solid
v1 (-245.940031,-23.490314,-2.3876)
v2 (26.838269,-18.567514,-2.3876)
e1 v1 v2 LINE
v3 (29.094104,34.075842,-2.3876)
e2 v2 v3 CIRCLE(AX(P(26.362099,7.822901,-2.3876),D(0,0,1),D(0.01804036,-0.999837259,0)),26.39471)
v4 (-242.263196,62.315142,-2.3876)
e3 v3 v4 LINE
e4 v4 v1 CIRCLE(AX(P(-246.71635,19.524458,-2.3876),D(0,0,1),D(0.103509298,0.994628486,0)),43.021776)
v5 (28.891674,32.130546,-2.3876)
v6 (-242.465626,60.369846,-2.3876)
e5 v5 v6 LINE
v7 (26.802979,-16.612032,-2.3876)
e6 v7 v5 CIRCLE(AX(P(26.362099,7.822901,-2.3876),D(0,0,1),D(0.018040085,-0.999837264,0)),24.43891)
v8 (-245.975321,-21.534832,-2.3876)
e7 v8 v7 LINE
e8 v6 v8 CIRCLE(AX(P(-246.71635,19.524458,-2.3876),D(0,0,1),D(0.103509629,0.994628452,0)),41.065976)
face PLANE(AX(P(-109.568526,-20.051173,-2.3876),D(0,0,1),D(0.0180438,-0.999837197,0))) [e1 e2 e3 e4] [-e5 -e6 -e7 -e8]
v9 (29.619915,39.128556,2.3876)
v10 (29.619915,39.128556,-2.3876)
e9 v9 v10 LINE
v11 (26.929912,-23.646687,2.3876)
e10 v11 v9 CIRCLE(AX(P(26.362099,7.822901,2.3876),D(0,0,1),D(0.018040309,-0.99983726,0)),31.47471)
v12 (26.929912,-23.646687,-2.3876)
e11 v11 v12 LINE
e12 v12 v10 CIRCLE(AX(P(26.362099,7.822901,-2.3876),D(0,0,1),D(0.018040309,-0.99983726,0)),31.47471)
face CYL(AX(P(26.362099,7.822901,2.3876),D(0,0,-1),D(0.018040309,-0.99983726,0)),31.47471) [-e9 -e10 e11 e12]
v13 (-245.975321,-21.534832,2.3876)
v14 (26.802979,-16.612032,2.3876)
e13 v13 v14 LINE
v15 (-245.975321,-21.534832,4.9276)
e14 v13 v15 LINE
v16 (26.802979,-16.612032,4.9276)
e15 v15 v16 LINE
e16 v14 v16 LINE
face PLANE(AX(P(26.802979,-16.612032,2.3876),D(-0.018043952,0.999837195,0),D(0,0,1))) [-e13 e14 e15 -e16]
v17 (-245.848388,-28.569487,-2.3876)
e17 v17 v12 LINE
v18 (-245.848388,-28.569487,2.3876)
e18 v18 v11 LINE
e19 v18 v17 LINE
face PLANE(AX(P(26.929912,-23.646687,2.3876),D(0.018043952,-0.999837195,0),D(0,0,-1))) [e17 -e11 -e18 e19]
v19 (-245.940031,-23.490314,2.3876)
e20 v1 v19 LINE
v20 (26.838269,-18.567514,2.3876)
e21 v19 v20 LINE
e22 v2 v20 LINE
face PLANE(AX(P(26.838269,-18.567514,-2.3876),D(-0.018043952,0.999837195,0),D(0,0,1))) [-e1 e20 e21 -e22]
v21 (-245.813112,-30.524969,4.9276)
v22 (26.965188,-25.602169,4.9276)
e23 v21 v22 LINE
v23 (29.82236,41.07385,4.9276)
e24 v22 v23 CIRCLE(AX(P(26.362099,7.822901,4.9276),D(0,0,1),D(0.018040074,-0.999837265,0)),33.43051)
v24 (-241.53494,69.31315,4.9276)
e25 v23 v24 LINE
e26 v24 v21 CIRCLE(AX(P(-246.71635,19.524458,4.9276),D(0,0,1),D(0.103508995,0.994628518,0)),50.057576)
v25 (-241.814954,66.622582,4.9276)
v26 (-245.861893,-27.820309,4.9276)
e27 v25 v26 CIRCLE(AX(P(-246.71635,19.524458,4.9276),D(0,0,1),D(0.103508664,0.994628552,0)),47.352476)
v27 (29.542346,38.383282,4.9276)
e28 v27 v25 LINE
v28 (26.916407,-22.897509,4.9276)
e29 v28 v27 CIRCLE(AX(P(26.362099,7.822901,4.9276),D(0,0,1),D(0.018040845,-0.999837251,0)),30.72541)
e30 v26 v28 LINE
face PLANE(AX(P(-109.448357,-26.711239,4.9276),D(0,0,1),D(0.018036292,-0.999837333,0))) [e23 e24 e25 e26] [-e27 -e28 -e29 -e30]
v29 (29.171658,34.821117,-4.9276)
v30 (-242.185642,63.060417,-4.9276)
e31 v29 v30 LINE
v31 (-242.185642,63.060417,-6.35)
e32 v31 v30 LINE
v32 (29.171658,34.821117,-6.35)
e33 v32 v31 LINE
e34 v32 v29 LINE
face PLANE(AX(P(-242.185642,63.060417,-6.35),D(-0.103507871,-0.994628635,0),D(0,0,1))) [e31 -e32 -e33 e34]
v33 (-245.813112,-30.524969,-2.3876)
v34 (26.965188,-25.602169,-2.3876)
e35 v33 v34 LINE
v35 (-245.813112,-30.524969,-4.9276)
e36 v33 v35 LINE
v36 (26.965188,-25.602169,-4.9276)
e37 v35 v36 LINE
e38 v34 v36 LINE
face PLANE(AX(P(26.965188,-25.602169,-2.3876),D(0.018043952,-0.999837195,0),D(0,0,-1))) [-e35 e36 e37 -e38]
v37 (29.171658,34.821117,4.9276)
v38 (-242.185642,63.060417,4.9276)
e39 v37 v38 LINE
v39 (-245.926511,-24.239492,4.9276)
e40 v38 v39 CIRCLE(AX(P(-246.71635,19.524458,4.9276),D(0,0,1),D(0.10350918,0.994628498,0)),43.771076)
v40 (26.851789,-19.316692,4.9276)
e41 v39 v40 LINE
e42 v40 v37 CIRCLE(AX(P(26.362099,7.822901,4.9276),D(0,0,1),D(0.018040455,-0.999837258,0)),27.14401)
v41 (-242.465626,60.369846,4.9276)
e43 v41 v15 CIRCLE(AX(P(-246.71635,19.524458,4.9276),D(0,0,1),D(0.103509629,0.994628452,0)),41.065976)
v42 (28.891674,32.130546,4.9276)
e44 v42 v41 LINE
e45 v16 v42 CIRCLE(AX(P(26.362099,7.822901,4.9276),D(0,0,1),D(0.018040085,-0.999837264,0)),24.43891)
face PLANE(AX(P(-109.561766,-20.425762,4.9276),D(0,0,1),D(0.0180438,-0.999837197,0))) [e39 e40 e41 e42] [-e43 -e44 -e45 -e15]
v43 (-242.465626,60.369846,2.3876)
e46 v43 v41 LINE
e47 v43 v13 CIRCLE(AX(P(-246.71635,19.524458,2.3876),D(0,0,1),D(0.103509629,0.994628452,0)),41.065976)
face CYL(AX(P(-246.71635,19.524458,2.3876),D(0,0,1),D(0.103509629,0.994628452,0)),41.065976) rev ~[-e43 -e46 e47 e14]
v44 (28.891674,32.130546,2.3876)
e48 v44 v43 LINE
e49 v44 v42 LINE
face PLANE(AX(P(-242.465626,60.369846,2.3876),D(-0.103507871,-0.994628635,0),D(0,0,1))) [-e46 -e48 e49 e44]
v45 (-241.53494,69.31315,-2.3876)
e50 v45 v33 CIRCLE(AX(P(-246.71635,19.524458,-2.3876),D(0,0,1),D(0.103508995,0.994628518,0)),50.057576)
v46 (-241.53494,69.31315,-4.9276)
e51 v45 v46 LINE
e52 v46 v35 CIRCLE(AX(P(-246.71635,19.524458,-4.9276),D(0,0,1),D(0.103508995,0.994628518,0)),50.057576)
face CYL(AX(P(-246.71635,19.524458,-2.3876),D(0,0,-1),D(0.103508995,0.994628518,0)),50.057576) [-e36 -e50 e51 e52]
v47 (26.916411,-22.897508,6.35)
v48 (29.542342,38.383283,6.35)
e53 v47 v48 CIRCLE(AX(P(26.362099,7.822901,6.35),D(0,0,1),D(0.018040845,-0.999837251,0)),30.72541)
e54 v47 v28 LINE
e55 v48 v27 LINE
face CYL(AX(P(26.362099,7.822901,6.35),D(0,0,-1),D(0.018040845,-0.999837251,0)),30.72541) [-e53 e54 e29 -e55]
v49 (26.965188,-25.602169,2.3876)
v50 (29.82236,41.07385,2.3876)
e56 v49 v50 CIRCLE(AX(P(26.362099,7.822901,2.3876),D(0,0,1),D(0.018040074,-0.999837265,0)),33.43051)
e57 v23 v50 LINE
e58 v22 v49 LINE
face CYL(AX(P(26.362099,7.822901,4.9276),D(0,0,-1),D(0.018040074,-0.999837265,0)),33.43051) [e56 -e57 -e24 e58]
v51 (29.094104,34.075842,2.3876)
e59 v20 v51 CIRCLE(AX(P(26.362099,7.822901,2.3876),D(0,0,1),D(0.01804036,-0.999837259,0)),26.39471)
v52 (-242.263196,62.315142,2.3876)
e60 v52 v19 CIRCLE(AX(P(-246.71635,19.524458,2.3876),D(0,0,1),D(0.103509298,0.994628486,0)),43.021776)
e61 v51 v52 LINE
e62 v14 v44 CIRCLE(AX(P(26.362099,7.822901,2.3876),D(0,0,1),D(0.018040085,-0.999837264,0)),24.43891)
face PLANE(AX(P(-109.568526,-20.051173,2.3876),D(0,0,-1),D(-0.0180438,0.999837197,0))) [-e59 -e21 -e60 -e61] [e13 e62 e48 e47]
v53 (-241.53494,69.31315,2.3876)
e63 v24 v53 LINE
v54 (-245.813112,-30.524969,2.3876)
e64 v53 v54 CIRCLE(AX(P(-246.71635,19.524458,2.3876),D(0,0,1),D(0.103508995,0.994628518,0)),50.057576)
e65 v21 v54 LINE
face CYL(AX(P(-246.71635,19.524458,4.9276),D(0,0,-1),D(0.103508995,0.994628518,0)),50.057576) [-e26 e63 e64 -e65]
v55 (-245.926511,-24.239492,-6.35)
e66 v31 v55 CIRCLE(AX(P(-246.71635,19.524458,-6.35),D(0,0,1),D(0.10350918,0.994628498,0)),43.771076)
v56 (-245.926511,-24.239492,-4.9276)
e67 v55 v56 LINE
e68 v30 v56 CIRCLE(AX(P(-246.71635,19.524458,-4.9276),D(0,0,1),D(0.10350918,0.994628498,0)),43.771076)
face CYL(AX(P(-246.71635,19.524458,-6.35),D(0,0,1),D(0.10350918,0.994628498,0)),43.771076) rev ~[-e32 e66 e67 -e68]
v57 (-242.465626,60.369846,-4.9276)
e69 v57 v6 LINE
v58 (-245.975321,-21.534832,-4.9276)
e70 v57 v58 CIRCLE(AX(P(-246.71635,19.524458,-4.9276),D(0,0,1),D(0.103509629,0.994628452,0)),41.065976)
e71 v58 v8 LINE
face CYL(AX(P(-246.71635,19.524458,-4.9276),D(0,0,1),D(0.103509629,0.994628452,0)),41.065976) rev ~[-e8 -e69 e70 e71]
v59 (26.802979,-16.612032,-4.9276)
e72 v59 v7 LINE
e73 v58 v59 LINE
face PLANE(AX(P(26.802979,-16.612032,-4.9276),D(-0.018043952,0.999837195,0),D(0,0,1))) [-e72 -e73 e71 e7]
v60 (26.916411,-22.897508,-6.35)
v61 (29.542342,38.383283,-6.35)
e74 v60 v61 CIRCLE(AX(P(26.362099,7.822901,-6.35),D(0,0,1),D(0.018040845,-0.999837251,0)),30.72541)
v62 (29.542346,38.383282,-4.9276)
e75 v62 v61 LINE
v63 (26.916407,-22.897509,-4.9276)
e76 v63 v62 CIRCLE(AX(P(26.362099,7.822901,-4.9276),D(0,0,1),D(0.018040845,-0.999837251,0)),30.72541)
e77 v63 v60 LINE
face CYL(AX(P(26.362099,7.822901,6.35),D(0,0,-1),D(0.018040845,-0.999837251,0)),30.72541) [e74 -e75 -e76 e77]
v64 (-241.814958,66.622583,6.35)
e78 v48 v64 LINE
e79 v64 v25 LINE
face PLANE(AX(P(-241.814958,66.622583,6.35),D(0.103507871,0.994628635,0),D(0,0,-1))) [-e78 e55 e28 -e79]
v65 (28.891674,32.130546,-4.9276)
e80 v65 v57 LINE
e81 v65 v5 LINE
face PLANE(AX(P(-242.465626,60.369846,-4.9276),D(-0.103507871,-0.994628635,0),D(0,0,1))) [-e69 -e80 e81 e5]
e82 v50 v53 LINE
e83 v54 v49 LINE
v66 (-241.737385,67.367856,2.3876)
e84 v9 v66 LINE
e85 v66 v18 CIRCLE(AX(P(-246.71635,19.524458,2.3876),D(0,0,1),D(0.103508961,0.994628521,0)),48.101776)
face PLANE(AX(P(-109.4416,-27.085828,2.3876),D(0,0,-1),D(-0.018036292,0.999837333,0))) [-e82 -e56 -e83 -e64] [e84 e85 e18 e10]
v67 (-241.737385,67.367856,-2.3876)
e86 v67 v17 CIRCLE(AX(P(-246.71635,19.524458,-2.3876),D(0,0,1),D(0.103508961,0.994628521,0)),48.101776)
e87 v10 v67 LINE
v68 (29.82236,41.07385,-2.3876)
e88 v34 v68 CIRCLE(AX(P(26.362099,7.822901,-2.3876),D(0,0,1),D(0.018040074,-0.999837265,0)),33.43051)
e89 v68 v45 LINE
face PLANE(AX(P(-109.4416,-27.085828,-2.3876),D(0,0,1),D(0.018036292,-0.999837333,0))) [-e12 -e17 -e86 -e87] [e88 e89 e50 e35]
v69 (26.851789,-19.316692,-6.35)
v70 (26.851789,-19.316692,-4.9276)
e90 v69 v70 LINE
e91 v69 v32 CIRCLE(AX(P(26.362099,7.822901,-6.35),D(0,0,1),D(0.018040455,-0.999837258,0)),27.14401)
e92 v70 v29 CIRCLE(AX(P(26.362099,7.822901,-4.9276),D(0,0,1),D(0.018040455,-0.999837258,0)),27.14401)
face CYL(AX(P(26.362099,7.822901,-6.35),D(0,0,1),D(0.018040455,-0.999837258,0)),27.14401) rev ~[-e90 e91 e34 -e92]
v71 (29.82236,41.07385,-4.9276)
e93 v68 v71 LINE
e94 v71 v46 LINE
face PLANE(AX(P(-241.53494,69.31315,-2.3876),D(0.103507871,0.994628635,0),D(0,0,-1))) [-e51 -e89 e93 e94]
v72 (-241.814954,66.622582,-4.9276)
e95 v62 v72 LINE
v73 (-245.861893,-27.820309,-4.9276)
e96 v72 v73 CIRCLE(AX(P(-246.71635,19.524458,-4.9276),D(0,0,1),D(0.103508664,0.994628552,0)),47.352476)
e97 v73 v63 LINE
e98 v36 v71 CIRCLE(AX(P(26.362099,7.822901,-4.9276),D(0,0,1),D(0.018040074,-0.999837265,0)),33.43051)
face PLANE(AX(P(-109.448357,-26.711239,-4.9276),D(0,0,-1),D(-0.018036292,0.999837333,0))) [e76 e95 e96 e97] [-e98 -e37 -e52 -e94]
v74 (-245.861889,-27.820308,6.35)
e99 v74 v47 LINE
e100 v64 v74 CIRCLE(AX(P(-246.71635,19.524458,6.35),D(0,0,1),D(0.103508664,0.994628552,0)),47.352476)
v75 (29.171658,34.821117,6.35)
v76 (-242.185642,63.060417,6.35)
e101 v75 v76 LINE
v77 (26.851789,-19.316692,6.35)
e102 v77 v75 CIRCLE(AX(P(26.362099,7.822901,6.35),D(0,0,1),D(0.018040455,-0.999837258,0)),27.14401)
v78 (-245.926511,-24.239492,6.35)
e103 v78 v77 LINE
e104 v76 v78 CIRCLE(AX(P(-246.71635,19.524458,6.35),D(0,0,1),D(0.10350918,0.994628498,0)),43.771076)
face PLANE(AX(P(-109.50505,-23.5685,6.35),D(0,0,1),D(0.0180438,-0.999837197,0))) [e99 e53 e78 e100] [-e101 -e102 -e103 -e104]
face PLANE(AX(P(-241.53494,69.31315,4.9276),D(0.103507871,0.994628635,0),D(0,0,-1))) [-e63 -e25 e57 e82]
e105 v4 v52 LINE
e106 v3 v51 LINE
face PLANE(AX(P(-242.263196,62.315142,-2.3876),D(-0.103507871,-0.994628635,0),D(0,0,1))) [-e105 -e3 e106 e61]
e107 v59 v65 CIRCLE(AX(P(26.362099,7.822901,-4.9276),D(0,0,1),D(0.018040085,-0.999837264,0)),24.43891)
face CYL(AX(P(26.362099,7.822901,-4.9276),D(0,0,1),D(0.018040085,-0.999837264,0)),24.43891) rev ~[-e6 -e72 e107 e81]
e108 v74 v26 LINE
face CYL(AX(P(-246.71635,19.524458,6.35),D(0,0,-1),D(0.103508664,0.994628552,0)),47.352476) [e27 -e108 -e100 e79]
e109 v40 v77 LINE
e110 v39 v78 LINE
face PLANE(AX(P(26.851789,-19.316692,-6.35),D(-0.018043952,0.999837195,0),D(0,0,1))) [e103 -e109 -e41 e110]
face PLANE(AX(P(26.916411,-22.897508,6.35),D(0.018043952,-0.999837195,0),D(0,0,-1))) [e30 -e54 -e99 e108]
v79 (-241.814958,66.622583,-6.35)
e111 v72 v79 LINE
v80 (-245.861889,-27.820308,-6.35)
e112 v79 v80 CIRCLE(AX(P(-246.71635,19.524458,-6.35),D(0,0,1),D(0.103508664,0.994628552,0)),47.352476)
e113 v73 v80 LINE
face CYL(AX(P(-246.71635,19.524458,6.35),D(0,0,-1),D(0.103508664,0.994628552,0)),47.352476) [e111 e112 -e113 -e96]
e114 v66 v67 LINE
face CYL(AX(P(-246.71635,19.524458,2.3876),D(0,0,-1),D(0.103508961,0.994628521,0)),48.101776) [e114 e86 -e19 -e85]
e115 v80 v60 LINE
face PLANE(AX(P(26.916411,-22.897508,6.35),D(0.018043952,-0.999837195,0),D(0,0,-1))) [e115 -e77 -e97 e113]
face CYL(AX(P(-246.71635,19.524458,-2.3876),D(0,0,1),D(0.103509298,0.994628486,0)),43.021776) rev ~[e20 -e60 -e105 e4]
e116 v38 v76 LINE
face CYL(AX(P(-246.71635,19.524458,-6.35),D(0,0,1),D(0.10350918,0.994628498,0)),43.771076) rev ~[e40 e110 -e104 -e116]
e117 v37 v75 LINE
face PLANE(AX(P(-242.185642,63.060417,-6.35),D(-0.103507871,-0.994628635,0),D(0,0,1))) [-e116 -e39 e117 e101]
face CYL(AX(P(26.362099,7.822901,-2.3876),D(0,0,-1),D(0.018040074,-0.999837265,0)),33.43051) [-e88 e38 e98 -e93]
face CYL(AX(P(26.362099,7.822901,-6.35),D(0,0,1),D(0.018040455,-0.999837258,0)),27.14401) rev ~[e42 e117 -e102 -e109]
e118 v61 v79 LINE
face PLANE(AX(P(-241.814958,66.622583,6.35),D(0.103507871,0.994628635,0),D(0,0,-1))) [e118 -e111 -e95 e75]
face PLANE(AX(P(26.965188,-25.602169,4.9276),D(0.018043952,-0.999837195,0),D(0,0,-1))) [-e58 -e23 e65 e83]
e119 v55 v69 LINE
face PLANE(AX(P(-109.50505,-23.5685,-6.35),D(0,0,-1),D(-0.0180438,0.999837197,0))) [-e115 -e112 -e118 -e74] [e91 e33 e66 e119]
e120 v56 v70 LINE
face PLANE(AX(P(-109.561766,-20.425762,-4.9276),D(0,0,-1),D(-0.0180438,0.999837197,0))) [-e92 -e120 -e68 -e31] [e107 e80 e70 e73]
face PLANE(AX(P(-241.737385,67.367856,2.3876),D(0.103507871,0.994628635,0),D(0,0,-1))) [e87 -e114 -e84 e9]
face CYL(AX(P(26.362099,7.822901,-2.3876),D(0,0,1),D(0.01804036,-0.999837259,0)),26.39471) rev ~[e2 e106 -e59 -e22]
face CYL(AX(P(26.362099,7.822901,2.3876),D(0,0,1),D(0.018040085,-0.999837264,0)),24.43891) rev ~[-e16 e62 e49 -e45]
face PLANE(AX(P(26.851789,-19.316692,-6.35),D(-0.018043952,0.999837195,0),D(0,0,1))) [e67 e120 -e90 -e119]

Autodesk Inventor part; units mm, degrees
ref_plane "Work Plane2" through (-246.7163, 19.5244, 0) normal (-1, 0, 0) x (0, 0, 1)
ref_plane "Work Plane3" through (26.3621, 7.8229, 0) normal (-0.9253906, 0.3790148, 0) x (0, 0, 1)
sketch "Path" plane through (0, 0, 0) normal (0, 0, 1) x (1, 0, 0)
  arc A0 (-242.0003, 64.8415) -> (-245.8942, -26.0299) centre (-246.7163, 19.5244) ccw
  arc A1 (26.8841, -21.1071) -> (29.357, 36.6022) centre (26.3621, 7.8229) ccw
  line L0 (26.8841, -21.1071) -> (-245.8942, -26.0299)
  line L1 (-242.0003, 64.8415) -> (29.357, 36.6022)
  dimension "d31" = 8.9916
ref_plane "Section Plane" through (-245.8942, -26.0299, 0) normal (0.9998372, 0.0180438, 0) x (0, 0, 1)
sketch "Section Sketch" plane through (-245.8942, -26.0299, 0) normal (0.9998372, 0.0180438, 0) x (0, 0, 1)
  line L0 (-6.35, -1.7907) -> (6.35, -1.7907)
  line L1 (6.35, -1.7907) -> (6.35, 1.7907)
  line L2 (6.35, 1.7907) -> (-6.35, 1.7907)
  line L3 (-6.35, 1.7907) -> (-6.35, -1.7907)
  line L4 (-2.3876, -2.54) -> (2.3876, -2.54)
  line L5 (2.3876, -2.54) -> (2.3876, 2.54)
  line L6 (2.3876, 2.54) -> (-2.3876, 2.54)
  line L7 (-2.3876, 2.54) -> (-2.3876, -2.54)
  line L8 (-2.3876, 0) -> (2.3876, 0) construction
  line L9 (-4.9276, -4.4958) -> (-2.3876, -4.4958)
  line L10 (-2.3876, -4.4958) -> (-2.3876, 4.4958)
  line L11 (-2.3876, 4.4958) -> (-4.9276, 4.4958)
  line L12 (-4.9276, 4.4958) -> (-4.9276, -4.4958)
  line L13 (2.3876, -4.4958) -> (4.9276, -4.4958)
  line L14 (4.9276, -4.4958) -> (4.9276, 4.4958)
  line L15 (4.9276, 4.4958) -> (2.3876, 4.4958)
  line L16 (2.3876, 4.4958) -> (2.3876, -4.4958)
  line L17 (-6.35, 0) -> (6.35, 0) construction
  point P0 (0, 0)
  point P1 (0, 0)
  dimension "d21" = 3.5814
  dimension "d22" = 5.08
  dimension "d23" = 4.7752
  dimension "d24" = 2.54
  dimension "d31" = 8.9916
  dimension "d32" = 12.7
sweep "Solid" add profiles "Section Sketch" path "Path"
pattern_of_one "Strand Pattern"
equation "\"d21\" = da_d2"
equation "\"d22\" = da_d1"
equation "\"d23\" = da_b1"
equation "\"d24\" = da_t1 + da_t2"
equation "\"d30\" = da_pt"
equation "\"da_p\" = 9.525"
equation "\"da_b1\" = 4.7752"
equation "\"da_h2\" = 8.9916"
equation "\"da_h3\" = 7.7978"
equation "\"da_d1\" = 5.08"
equation "\"da_d2\" = 3.5814"
equation "\"da_pt\" = 10.1346"
equation "\"da_b\" = 12.7"
equation "\"da_t1\" = 1.27"
equation "\"da_t2\" = 1.27"
properties part number "Cadena"
